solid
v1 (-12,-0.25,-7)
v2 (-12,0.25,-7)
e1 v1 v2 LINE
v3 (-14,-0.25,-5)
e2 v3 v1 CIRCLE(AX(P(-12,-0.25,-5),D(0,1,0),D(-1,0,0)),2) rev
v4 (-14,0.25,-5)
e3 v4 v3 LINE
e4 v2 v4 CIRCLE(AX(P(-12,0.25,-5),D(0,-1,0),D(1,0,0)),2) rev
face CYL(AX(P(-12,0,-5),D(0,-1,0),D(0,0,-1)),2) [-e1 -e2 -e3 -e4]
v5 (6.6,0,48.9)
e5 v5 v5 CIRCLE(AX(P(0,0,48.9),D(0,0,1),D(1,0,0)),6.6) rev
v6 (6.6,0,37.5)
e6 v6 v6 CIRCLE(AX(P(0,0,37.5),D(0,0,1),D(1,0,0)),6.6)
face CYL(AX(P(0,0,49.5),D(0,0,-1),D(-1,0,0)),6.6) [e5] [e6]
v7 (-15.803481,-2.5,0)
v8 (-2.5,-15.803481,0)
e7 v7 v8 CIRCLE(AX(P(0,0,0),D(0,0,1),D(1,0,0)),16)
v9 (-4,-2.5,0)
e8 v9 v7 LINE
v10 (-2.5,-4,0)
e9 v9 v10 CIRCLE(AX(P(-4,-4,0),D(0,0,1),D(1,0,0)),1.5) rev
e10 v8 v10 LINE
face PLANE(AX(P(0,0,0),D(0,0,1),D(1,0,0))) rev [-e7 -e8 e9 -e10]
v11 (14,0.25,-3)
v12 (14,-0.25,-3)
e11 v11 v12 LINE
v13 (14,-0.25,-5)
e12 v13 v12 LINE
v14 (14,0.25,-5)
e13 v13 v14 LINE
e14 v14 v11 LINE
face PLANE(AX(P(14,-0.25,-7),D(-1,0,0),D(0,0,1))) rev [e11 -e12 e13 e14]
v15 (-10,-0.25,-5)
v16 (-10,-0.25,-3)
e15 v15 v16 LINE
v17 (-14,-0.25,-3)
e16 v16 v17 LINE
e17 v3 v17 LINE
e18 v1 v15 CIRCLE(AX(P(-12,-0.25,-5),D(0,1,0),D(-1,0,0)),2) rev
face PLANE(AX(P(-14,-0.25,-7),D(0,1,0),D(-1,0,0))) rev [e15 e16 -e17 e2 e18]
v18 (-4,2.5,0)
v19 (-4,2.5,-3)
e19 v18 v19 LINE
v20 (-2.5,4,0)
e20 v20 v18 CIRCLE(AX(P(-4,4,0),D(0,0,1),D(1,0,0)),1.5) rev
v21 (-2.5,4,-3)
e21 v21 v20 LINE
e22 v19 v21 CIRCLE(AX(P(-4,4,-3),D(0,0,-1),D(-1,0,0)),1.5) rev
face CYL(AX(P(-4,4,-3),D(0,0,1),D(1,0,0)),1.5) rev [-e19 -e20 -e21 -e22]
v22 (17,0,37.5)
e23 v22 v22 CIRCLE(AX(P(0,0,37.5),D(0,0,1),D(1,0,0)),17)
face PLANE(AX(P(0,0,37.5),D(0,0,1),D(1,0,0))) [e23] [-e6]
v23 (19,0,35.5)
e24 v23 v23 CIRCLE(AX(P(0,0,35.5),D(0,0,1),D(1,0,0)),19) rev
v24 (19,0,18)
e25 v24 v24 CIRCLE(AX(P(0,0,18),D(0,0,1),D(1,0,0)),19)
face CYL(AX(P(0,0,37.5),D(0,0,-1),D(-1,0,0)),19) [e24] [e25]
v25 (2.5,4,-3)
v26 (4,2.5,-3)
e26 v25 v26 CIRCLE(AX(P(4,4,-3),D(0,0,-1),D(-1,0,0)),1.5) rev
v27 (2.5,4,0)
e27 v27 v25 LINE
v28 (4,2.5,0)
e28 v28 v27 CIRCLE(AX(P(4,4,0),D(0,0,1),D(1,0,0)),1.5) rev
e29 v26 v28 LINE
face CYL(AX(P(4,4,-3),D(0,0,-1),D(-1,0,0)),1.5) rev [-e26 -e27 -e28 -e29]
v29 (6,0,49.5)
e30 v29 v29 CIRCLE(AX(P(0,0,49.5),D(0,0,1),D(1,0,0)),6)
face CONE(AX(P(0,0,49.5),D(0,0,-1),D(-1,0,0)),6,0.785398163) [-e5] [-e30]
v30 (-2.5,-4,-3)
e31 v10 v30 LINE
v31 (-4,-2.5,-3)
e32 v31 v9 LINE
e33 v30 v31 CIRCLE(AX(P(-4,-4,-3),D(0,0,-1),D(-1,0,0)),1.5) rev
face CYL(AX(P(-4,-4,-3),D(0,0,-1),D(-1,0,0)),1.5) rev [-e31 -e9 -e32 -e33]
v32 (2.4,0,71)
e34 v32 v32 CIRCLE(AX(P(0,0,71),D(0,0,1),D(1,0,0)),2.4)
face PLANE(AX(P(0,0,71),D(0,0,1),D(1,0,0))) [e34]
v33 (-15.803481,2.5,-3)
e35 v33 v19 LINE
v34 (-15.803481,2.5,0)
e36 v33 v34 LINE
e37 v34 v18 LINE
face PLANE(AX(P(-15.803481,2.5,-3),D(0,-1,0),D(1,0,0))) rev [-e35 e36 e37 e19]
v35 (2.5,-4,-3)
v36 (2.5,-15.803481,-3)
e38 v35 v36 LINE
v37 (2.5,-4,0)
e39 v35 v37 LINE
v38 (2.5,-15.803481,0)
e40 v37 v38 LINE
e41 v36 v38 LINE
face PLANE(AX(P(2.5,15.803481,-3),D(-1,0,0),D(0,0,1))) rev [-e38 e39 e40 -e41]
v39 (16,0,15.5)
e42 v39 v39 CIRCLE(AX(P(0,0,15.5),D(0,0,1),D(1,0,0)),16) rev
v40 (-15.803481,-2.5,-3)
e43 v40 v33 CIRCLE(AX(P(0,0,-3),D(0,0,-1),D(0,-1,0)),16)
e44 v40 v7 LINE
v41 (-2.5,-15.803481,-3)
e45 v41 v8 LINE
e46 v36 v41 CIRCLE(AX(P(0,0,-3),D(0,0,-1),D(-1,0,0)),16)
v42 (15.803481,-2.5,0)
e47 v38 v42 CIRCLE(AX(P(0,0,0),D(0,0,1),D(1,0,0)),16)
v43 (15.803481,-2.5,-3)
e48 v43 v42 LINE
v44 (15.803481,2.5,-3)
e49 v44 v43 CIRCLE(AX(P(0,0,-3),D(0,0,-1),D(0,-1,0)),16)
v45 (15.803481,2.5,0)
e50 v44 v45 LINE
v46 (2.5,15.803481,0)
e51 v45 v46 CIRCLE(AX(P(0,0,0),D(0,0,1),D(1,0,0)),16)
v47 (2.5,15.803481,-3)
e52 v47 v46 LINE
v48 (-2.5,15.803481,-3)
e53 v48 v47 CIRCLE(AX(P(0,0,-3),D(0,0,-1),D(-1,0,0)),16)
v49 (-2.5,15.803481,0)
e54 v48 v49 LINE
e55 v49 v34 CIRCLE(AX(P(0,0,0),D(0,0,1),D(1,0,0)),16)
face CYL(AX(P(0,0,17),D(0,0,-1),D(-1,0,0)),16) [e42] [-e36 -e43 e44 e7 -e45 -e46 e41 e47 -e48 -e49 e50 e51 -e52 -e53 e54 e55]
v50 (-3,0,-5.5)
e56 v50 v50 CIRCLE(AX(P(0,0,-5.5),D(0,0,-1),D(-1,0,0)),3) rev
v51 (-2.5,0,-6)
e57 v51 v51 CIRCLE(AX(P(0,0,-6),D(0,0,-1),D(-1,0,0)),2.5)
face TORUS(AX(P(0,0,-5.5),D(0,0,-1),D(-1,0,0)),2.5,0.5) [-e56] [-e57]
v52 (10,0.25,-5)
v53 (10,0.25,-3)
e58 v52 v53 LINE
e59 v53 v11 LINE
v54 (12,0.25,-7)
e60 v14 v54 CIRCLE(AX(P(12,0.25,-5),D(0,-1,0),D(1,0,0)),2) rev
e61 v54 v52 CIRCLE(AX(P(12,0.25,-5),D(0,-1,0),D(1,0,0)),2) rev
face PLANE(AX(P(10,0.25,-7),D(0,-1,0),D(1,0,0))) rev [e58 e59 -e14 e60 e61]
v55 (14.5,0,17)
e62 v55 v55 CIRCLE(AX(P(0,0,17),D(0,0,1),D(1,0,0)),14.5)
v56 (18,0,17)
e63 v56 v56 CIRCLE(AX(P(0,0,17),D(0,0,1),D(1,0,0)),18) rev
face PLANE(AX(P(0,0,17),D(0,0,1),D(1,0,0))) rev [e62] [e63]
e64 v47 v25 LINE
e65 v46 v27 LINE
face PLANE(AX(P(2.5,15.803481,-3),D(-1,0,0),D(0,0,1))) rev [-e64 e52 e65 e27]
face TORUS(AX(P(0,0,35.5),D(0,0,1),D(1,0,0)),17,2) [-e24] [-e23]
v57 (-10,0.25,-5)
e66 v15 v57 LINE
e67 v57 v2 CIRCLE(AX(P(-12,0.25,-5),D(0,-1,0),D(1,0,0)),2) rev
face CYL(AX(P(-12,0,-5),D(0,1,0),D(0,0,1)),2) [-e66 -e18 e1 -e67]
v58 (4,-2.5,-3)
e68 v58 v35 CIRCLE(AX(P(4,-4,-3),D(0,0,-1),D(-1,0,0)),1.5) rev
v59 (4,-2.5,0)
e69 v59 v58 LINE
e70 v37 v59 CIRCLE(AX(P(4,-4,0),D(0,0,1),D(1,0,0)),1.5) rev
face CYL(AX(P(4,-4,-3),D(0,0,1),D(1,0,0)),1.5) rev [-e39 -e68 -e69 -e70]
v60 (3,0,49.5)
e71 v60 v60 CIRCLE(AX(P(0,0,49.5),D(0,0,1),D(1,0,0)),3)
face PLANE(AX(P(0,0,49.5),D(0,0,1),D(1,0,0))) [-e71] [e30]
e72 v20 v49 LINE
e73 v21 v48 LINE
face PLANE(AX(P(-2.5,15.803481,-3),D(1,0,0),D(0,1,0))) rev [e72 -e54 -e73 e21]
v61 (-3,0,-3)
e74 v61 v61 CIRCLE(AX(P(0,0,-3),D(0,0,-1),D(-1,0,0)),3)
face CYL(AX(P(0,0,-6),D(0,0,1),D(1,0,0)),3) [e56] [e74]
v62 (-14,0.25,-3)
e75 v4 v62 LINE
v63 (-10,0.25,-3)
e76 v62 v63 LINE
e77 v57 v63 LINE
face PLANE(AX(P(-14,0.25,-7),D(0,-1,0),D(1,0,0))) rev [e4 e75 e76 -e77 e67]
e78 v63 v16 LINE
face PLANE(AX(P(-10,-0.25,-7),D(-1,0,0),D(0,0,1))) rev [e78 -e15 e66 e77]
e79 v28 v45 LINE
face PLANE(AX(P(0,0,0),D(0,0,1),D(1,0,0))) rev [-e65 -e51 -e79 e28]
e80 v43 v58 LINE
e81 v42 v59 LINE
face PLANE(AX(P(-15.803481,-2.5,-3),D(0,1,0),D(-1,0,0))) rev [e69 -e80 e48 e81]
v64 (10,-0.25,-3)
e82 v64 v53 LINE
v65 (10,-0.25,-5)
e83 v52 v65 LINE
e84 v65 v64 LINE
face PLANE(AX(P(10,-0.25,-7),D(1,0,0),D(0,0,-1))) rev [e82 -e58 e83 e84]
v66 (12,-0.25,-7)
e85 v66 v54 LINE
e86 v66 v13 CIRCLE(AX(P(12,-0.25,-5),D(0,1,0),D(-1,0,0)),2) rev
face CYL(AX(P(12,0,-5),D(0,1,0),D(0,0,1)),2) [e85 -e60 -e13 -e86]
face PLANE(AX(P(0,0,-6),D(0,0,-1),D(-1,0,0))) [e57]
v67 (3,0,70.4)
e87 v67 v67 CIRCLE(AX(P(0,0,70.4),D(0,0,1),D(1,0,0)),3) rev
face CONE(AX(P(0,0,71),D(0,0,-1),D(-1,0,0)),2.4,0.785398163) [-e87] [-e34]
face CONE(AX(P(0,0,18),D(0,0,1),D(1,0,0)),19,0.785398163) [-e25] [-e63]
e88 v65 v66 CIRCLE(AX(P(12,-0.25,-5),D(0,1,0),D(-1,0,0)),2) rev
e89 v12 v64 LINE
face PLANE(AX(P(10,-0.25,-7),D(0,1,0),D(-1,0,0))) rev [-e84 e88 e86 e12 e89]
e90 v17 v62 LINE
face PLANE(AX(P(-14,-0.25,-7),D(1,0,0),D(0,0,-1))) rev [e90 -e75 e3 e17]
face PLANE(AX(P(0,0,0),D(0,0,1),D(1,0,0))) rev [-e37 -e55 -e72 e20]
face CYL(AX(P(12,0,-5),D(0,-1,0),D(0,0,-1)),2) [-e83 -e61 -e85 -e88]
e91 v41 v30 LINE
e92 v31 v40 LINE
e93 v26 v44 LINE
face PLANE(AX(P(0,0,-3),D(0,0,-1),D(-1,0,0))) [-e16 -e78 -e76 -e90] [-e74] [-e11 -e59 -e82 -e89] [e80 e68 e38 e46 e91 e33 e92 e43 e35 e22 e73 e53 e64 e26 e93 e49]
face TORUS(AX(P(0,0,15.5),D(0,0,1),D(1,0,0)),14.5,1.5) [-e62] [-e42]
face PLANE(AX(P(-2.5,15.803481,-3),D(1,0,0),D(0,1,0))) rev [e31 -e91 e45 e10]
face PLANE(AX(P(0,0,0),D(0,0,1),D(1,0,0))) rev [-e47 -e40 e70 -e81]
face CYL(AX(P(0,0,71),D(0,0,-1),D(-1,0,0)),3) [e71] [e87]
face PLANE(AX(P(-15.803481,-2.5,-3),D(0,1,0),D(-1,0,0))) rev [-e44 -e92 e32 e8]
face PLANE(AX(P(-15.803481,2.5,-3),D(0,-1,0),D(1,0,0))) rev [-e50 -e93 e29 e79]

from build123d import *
from build123d.topology import SkipClean

# Parameters (mm, degrees)
SKETCH1_R           = 16
BOSS_EXTRUDE1_DEPTH = 17
FILLET1_R           = 1.5
BOSS_EXTRUDE2_START = 3
BOSS_EXTRUDE2_DEPTH = 3
CIRPATTERN1_COUNT   = 4
FILLET2_R           = 1.5
SKETCH5_R           = 3
BOSS_EXTRUDE3_DEPTH = 3
FILLET3_R           = 0.5
SKETCH6_R           = 19
BOSS_EXTRUDE4_DEPTH = 20.5
CHAMFER1_SIZE       = 1
SKETCH7_W           = 4
SKETCH7_H           = 0.5
BOSS_EXTRUDE5_DEPTH = 4
FILLET4_R           = 2
FILLET5_R           = 2
SKETCH8_R           = 6.6
BOSS_EXTRUDE6_DEPTH = 12
BOSS_EXTRUDE7_START = 21.5
SKETCH9_R           = 3
BOSS_EXTRUDE7_DEPTH = 21.5
CHAMFER2_SIZE       = 0.6
CHAMFER3_SIZE       = 0.6


with BuildPart() as part:
    # Sketch1 → Boss-Extrude1 (new body)
    with BuildSketch(Plane.XY):
        Circle(SKETCH1_R)
    extrude(amount=BOSS_EXTRUDE1_DEPTH)

    # Fillet1
    fillet1_edges = [part.edges().sort_by_distance(p)[0] for p in [
        (-16, 0, 17),
    ]]
    fillet(fillet1_edges, radius=FILLET1_R)

    # Sketch3 → Boss-Extrude2 (add)
    with SkipClean():  # the faces are left unmerged after this step: merging them gives an invalid solid
        with BuildSketch(Plane(origin=(0, 0, 0), x_dir=(-1, 0, 0), z_dir=(0, 0, -1)).offset(BOSS_EXTRUDE2_START)):
            with BuildLine():
                Line((-2.5, 15.803481), (-2.5, -15.803481))
                ThreePointArc((-2.5, -15.803481), (0, -16), (2.5, -15.803481))
                Line((2.5, -15.803481), (2.5, 15.803481))
                ThreePointArc((2.5, 15.803481), (0, 16), (-2.5, 15.803481))
            make_face()
        boss_extrude2 = extrude(amount=-BOSS_EXTRUDE2_DEPTH)

    # CirPattern1: Boss-Extrude2 ×4 about axis
    with SkipClean():  # the faces are left unmerged after this step: merging them gives an invalid solid
        cirpattern1_axis = Axis((0, 0, 0), (0, 0, -1))
        for i in range(1, CIRPATTERN1_COUNT):
            add(boss_extrude2.rotate(cirpattern1_axis, i * 360 / CIRPATTERN1_COUNT))

    # Fillet2
    fillet2_edges = [part.edges().sort_by_distance(p)[0] for p in [
        (-2.5, 2.5, -1.5),
        (2.5, 2.5, -1.5),
        (-2.5, -2.5, -1.5),
        (2.5, -2.5, -1.5),
    ]]
    fillet(fillet2_edges, radius=FILLET2_R)

    # Sketch5 → Boss-Extrude3 (add)
    with SkipClean():  # the faces are left unmerged after this step: merging them gives an invalid solid
        with BuildSketch(Plane(origin=(0, 0, -3), x_dir=(-1, 0, 0), z_dir=(0, 0, -1))):
            Circle(SKETCH5_R)
        extrude(amount=BOSS_EXTRUDE3_DEPTH)

    # Fillet3
    fillet3_edges = [part.edges().sort_by_distance(p)[0] for p in [
        (3, 0, -6),
    ]]
    fillet(fillet3_edges, radius=FILLET3_R)

    # Sketch6 → Boss-Extrude4 (add)
    with SkipClean():  # the faces are left unmerged after this step: merging them gives an invalid solid
        with BuildSketch(Plane.XY.offset(17)):
            Circle(SKETCH6_R)
        extrude(amount=BOSS_EXTRUDE4_DEPTH)

    # Chamfer1
    chamfer1_edges = [part.edges().sort_by_distance(p)[0] for p in [
        (-19, 0, 17),
    ]]
    chamfer(chamfer1_edges, length=CHAMFER1_SIZE)

    # Sketch7 → Boss-Extrude5 (add)
    with SkipClean():  # the faces are left unmerged after this step: merging them gives an invalid solid
        with BuildSketch(Plane(origin=(0, 0, -3), x_dir=(-1, 0, 0), z_dir=(0, 0, -1))):
            with Locations((12, 0)):
                Rectangle(SKETCH7_W, SKETCH7_H)
            with Locations((-12, 0)):
                Rectangle(SKETCH7_W, SKETCH7_H)
        extrude(amount=BOSS_EXTRUDE5_DEPTH)

    # Fillet4
    fillet4_edges = [part.edges().sort_by_distance(p)[0] for p in [
        (14, 0, -7),
        (10, 0, -7),
        (-10, 0, -7),
        (-14, 0, -7),
    ]]
    fillet(fillet4_edges, radius=FILLET4_R - 0.0001)  # a hair under: the kernel refuses the full size

    # Fillet5
    fillet5_edges = [part.edges().sort_by_distance(p)[0] for p in [
        (-19, 0, 37.5),
    ]]
    fillet(fillet5_edges, radius=FILLET5_R)

    # Sketch8 → Boss-Extrude6 (add)
    with BuildSketch(Plane.XY.offset(37.5)):
        Circle(SKETCH8_R)
    extrude(amount=BOSS_EXTRUDE6_DEPTH)

    # Sketch9 → Boss-Extrude7 (add)
    with BuildSketch(Plane.XY.offset(49.5).offset(BOSS_EXTRUDE7_START)):
        with Locations(Location((0, 0, 0), (0, 0, 180))):
            Circle(SKETCH9_R)
    extrude(amount=-BOSS_EXTRUDE7_DEPTH)

    # Chamfer2
    chamfer2_edges = [part.edges().sort_by_distance(p)[0] for p in [
        (3, 0, 71),
    ]]
    chamfer(chamfer2_edges, length=CHAMFER2_SIZE)

    # Chamfer3
    chamfer3_edges = [part.edges().sort_by_distance(p)[0] for p in [
        (-6.6, 0, 49.5),
    ]]
    chamfer(chamfer3_edges, length=CHAMFER3_SIZE)


solid = part.part
